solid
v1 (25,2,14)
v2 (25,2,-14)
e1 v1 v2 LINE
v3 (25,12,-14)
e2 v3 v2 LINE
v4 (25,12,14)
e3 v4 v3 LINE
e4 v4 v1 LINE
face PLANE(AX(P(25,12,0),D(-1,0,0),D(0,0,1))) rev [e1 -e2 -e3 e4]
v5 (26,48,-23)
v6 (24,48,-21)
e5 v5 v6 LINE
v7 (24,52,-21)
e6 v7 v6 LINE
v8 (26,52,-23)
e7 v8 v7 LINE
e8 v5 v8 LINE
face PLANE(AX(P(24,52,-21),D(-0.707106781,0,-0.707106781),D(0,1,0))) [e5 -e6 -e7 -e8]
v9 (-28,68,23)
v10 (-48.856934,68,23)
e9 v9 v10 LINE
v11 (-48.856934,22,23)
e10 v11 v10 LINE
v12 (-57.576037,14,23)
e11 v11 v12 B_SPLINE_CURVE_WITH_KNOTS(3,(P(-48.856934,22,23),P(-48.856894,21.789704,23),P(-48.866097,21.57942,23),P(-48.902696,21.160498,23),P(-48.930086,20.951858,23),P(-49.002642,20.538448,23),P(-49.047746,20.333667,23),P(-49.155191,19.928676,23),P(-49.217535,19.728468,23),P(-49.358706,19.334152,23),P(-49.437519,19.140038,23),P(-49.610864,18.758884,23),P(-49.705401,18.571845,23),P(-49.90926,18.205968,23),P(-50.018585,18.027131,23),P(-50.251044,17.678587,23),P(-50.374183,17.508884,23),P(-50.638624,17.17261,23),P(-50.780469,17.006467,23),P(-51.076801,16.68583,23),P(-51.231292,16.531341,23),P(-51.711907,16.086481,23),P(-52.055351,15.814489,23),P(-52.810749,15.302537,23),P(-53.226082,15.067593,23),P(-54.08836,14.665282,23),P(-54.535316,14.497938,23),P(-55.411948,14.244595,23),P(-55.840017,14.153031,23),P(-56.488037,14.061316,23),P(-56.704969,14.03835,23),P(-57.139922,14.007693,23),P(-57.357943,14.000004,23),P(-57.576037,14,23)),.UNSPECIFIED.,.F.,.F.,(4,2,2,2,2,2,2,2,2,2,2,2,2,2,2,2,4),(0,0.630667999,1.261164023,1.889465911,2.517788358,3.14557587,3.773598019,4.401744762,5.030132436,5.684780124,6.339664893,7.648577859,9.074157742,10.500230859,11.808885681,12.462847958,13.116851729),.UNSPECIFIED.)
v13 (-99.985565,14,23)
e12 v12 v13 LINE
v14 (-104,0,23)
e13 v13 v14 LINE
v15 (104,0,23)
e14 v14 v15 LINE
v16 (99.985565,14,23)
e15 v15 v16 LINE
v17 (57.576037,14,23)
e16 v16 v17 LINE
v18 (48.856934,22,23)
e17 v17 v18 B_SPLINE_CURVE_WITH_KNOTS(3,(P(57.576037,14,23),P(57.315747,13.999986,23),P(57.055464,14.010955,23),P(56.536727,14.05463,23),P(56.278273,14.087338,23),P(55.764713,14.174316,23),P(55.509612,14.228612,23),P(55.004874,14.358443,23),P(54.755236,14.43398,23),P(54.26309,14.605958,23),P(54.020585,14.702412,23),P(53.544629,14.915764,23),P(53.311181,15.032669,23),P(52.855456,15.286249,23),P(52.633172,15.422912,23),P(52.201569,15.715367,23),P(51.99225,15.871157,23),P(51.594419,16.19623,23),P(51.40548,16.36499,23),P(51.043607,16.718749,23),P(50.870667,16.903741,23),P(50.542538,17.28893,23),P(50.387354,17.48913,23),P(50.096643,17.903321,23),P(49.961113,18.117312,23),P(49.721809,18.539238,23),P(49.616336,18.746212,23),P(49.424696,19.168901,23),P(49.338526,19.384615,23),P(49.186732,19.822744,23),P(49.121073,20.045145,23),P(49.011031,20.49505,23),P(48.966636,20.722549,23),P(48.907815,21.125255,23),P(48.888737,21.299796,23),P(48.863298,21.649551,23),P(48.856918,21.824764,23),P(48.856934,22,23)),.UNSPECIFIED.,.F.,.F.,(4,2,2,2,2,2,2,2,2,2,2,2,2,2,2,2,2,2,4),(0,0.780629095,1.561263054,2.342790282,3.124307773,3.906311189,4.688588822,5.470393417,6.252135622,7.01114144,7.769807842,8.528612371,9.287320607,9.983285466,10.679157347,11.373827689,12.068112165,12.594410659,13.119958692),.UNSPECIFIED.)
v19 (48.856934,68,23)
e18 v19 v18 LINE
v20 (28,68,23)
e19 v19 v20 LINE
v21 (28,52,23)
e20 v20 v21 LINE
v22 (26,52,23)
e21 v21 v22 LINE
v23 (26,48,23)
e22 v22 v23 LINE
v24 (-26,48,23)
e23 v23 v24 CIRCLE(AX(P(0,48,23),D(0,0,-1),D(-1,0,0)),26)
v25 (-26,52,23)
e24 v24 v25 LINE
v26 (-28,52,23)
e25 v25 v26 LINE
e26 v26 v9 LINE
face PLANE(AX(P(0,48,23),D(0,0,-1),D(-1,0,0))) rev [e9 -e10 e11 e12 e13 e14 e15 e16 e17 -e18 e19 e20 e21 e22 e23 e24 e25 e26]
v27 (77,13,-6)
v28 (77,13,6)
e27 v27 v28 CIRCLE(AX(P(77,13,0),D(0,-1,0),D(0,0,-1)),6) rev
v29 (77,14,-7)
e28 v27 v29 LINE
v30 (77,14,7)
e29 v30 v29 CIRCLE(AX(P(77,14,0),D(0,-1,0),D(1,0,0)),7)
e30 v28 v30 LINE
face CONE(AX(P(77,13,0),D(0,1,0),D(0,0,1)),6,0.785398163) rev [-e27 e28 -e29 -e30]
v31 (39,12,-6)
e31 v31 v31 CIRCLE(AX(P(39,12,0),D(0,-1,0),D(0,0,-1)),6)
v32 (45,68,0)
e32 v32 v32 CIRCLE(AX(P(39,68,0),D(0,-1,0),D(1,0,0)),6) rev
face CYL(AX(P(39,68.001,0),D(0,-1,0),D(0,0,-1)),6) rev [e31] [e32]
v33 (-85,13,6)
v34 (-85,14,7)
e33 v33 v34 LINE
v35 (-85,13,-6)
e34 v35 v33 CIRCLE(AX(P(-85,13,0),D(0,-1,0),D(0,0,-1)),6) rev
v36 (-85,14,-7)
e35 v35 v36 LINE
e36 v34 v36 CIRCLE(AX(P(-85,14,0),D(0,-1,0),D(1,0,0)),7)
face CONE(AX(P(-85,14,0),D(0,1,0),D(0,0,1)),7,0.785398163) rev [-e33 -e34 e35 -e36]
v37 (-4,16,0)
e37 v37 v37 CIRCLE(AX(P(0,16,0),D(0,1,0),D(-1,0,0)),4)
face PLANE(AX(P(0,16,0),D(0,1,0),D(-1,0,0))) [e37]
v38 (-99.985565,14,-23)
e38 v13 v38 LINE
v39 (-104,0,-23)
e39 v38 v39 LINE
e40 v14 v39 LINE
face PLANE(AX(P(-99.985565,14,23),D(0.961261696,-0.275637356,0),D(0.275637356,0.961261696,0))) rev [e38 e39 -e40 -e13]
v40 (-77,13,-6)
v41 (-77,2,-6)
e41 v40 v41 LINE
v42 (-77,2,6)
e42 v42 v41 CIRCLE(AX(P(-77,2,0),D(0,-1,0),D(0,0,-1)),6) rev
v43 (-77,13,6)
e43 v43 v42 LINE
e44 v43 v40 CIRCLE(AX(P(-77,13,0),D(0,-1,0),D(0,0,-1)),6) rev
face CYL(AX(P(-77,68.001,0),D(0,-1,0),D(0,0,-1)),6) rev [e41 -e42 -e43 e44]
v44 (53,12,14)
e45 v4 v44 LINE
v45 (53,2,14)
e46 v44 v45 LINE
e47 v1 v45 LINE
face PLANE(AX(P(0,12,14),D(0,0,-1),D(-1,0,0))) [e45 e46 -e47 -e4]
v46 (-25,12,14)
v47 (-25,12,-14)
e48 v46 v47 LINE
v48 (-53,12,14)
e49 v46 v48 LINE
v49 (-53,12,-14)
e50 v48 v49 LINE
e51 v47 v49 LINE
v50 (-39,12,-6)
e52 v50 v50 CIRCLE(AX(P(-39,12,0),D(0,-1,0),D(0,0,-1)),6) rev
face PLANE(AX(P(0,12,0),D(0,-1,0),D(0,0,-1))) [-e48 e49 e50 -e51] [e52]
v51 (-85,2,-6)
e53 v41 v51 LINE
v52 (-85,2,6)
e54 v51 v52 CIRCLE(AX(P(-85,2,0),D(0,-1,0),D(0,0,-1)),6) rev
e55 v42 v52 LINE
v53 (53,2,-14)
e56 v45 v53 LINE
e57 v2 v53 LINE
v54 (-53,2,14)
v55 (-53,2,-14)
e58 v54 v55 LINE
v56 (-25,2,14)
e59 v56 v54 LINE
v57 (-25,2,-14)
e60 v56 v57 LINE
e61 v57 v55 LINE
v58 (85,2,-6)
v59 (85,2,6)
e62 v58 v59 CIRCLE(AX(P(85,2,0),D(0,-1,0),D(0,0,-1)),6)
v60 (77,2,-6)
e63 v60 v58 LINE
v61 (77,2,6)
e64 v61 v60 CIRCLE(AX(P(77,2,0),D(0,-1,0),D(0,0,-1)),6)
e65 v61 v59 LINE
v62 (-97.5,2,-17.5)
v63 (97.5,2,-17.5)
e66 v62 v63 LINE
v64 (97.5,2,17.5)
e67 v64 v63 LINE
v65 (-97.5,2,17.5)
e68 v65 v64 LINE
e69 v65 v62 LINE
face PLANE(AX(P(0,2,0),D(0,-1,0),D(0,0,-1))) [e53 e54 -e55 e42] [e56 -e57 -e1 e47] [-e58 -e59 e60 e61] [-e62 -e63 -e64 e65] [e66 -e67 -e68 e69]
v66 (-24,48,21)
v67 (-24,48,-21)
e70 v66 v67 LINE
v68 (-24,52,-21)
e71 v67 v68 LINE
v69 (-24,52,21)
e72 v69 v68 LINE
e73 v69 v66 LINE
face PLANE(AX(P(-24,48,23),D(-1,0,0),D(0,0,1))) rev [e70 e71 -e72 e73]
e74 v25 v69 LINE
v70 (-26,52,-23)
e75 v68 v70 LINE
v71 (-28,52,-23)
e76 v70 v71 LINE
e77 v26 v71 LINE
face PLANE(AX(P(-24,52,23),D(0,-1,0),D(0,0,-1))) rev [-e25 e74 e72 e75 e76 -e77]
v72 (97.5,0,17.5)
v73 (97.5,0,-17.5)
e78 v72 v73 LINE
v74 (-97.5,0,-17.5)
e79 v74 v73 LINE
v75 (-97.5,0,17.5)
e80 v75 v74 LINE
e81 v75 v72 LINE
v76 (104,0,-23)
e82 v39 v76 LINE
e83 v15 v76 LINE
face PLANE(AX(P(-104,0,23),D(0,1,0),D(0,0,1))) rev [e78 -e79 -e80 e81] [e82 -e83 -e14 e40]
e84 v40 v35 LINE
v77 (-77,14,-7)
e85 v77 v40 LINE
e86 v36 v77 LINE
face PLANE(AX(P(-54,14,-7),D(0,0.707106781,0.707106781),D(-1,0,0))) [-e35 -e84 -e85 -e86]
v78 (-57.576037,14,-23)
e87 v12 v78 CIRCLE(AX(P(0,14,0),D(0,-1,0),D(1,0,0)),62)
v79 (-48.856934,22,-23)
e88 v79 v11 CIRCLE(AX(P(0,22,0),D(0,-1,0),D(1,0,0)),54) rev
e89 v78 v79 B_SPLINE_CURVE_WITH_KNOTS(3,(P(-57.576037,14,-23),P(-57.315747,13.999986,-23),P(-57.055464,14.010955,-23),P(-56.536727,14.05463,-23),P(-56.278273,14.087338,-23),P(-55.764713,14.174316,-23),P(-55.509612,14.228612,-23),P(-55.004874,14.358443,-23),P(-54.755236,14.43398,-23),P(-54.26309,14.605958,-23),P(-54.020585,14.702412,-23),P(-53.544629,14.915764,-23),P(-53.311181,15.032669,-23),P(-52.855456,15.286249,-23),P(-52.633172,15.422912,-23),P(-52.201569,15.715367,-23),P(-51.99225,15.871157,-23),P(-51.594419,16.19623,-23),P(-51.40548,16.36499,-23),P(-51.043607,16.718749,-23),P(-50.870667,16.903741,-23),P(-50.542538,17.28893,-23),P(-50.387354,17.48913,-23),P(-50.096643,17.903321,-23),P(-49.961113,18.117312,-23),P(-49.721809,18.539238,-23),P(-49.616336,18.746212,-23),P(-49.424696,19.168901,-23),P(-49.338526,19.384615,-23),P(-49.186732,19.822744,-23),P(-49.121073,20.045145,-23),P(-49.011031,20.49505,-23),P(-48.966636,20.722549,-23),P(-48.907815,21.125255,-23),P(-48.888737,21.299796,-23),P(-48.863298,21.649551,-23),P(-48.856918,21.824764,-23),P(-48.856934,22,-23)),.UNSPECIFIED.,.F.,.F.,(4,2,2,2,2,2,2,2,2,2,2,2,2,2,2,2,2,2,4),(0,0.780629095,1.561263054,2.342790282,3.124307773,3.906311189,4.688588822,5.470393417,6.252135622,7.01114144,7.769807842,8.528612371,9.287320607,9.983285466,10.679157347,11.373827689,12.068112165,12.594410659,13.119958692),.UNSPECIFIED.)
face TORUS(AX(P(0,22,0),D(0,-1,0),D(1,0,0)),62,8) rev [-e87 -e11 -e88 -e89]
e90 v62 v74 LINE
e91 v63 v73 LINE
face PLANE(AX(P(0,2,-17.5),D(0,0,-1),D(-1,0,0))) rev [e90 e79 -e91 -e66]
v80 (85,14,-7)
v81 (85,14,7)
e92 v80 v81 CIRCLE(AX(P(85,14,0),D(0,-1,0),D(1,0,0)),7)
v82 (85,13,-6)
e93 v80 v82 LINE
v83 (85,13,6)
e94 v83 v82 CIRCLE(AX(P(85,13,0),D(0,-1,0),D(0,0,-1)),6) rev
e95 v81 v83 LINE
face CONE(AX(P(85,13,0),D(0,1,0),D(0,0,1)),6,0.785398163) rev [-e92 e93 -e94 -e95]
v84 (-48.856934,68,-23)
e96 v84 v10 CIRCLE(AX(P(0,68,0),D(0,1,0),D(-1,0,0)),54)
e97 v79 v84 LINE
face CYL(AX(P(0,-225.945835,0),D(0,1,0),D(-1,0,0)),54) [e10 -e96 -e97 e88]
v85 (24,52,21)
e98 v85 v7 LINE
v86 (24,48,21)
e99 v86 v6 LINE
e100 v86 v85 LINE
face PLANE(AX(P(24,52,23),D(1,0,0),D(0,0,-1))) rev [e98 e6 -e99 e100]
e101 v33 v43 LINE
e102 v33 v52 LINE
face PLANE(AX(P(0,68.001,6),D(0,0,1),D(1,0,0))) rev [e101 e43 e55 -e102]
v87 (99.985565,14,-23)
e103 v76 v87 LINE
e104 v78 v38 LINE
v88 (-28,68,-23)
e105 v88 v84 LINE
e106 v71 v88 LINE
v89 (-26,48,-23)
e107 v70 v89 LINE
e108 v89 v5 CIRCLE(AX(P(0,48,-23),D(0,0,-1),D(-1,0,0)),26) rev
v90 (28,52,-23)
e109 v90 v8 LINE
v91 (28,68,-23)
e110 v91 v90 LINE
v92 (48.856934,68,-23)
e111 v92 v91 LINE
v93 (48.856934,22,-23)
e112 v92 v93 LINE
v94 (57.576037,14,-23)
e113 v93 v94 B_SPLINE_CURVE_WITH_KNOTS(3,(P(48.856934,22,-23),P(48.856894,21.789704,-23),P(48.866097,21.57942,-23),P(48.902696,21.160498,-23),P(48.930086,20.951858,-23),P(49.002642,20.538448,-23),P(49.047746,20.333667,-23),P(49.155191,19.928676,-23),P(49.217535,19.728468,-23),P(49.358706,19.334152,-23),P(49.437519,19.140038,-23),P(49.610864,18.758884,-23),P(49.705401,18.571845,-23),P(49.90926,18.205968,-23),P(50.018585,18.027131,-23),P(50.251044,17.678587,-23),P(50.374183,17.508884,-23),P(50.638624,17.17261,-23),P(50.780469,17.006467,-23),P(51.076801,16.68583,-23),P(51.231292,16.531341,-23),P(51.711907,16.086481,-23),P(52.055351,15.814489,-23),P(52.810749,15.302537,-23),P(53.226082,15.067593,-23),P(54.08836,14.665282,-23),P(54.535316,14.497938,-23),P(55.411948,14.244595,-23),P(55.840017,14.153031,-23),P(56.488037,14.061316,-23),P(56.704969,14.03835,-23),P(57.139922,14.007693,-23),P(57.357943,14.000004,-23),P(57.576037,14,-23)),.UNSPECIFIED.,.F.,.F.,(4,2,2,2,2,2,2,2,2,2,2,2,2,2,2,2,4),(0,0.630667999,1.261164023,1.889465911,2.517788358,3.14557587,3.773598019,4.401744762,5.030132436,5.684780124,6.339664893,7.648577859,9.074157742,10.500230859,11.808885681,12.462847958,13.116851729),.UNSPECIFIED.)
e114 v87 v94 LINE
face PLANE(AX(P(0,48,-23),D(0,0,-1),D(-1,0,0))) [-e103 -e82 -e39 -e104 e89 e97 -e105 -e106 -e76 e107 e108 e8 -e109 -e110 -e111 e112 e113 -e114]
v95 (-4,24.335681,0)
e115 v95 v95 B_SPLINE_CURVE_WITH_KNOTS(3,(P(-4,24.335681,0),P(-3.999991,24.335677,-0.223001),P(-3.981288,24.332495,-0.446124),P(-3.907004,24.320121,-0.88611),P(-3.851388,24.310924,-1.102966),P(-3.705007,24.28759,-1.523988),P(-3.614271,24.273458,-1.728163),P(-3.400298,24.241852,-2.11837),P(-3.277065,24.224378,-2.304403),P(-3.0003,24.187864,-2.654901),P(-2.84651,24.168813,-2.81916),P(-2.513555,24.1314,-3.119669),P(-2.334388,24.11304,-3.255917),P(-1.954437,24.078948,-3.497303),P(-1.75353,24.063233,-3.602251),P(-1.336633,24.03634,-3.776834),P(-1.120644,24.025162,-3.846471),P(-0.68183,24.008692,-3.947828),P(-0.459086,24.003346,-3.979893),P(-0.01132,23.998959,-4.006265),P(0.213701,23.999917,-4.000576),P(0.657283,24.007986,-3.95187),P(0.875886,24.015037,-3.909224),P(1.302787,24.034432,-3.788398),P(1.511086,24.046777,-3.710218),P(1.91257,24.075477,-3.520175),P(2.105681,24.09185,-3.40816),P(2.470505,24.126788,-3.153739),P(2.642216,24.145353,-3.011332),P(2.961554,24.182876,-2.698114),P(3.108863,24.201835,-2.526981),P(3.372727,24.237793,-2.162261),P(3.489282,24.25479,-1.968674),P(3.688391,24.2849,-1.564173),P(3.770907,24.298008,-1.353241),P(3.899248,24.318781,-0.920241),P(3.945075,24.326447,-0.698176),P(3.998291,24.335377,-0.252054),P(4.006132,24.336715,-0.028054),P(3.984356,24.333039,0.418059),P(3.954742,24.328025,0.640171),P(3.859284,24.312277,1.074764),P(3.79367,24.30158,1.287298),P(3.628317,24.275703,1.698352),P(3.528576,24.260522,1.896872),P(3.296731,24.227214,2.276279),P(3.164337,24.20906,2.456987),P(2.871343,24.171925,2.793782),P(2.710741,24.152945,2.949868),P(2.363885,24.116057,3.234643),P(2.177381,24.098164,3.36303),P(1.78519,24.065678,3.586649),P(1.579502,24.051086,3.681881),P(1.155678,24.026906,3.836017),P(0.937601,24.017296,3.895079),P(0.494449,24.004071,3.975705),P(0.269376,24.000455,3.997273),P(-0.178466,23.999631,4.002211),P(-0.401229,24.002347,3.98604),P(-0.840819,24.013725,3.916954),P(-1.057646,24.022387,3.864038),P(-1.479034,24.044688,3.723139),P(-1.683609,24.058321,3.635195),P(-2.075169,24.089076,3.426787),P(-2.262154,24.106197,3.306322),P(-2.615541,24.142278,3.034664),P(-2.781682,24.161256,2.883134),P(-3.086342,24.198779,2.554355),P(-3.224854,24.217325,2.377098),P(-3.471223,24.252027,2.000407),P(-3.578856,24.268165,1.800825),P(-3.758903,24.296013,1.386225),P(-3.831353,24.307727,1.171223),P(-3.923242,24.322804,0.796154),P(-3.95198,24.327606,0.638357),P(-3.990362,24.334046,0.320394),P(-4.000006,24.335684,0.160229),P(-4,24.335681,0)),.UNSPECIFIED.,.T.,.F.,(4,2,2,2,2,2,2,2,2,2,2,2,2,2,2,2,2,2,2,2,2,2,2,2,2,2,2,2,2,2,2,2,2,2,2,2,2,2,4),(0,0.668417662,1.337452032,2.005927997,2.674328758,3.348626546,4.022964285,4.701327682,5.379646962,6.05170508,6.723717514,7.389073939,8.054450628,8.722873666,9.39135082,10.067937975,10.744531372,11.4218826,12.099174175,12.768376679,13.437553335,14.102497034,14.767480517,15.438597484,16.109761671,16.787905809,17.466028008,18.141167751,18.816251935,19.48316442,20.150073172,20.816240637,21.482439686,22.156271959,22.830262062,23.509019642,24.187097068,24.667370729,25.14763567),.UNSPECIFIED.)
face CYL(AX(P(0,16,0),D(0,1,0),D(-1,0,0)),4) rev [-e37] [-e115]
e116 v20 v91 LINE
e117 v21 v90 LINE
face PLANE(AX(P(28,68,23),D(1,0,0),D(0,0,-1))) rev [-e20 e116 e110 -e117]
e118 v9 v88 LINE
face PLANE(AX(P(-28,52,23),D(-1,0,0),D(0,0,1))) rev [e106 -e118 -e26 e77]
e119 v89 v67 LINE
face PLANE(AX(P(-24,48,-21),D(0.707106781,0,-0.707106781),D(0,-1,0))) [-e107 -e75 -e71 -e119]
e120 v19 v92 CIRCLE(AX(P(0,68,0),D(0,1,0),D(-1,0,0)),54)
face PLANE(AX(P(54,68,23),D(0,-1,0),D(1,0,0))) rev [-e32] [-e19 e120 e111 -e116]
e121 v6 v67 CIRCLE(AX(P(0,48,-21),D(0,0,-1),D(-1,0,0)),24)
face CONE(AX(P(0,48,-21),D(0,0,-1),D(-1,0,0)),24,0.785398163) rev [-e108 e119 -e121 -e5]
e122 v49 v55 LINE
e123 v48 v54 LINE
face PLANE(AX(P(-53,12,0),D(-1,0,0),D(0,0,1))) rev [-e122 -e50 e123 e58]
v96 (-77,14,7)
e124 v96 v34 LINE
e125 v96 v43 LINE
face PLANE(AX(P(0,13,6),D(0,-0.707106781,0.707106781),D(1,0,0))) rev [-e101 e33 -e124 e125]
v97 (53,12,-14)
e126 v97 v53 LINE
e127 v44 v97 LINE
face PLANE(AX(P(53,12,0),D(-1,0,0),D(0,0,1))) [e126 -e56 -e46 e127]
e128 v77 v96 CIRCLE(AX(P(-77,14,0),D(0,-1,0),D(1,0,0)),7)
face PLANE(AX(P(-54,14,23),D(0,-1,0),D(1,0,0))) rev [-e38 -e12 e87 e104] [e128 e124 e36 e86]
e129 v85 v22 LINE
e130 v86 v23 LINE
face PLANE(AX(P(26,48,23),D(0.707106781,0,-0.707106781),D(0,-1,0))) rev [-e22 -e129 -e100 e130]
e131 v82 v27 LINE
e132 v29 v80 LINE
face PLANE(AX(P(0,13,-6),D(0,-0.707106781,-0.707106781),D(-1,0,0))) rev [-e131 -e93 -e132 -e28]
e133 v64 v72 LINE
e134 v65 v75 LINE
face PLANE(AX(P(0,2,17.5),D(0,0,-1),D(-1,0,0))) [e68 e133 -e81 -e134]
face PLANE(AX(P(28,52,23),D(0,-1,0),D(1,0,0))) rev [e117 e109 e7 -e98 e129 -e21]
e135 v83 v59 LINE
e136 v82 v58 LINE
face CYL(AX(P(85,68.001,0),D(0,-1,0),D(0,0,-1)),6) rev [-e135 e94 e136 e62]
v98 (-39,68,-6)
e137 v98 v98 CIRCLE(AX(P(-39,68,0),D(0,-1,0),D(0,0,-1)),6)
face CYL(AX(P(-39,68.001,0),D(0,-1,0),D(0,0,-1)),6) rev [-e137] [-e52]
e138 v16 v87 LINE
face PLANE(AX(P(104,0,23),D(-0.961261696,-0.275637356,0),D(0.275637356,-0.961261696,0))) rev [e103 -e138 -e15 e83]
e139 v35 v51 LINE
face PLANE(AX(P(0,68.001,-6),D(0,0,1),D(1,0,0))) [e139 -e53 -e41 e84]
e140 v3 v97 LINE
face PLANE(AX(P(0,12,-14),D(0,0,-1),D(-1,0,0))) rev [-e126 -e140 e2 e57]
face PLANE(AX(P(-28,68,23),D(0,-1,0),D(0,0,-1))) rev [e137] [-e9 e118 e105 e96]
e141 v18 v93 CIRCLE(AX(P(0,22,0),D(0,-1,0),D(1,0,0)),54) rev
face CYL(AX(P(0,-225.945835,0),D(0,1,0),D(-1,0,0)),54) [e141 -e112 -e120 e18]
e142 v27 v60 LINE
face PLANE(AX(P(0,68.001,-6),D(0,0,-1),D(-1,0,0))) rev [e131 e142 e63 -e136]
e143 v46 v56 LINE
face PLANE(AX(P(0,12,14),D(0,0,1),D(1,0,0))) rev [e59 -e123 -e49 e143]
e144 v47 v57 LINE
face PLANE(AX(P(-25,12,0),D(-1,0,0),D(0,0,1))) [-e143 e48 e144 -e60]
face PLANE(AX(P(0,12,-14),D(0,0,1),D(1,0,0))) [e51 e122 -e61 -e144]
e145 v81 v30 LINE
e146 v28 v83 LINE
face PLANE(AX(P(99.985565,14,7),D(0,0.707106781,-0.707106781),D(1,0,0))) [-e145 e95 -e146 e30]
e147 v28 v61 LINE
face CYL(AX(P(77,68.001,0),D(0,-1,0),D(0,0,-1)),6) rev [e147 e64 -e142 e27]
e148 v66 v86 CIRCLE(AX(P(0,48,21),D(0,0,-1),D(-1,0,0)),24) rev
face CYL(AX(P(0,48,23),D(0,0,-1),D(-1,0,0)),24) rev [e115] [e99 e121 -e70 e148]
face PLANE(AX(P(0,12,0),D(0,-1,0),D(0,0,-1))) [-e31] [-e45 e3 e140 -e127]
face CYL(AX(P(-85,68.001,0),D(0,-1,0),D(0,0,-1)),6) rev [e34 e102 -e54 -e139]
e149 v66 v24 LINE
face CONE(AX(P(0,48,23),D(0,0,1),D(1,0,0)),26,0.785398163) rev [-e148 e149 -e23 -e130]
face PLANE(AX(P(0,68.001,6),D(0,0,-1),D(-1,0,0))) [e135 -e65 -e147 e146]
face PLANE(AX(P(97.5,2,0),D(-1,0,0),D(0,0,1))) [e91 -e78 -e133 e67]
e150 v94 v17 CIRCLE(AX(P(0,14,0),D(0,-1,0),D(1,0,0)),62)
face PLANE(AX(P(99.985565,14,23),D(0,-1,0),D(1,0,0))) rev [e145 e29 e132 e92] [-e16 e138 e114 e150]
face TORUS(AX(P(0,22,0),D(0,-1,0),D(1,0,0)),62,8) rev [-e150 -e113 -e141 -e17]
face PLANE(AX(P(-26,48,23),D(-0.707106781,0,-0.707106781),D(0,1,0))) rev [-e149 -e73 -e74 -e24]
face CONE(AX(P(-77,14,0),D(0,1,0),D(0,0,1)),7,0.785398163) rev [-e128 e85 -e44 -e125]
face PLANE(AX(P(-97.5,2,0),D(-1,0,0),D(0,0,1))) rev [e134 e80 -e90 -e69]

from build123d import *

# Parameters (mm, degrees)
BOSS_EXTRUDE1_DEPTH = 23
CUT_EXTRUDE1_START  = -54
CUT_EXTRUDE1_DEPTH  = 54
CUT_EXTRUDE2_REACH  = 128.369
SKETCH3_R           = 6
SKETCH3_3_W         = 28
SKETCH3_3_H         = 28
SKETCH3_3_R         = 6
CUT_EXTRUDE3_DEPTH  = 12
SKETCH3_4_W         = 195
SKETCH3_4_H         = 35
SKETCH3_4_W_2       = 28
SKETCH3_4_H_2       = 28
CUT_EXTRUDE4_DEPTH  = 2
FILLET1_R           = 8
CHAMFER1_SIZE       = 2
CHAMFER2_SIZE       = 1
SKETCH4_R           = 4
CUT_EXTRUDE5_DEPTH  = 52


# Read off the part's stored shape, not the designer's step: Cut-Extrude1
with BuildPart() as part:
    # Sketch1 → Boss-Extrude1 (new, symmetric)
    with BuildSketch(Plane.XY):
        with BuildLine():
            Line((-104, 0), (104, 0))
            Line((104, 0), (99.985564599, 14))
            Line((99.985564599, 14), (54, 14))
            Line((54, 14), (54, 68))
            Line((54, 68), (28, 68))
            Line((28, 68), (28, 52))
            Line((28, 52), (24, 52))
            Line((24, 52), (24, 48))
            ThreePointArc((24, 48), (0, 24), (-24, 48))
            Line((-24, 48), (-24, 52))
            Line((-24, 52), (-28, 52))
            Line((-28, 52), (-28, 68))
            Line((-28, 68), (-54, 68))
            Line((-54, 68), (-54, 14))
            Line((-54, 14), (-99.985564599, 14))
            Line((-99.985564599, 14), (-104, 0))
        make_face()
    extrude(amount=BOSS_EXTRUDE1_DEPTH, both=True)

    # Cut-Extrude1 outline → Cut-Extrude1 (cut)
    with BuildSketch(Plane(origin=(0, 68, 0), x_dir=(1, 0, 0), z_dir=(0, 1, 0)).offset(CUT_EXTRUDE1_START)):
        with BuildLine():
            ThreePointArc((-54, 0), (-52.698550436, 11.784005345), (-48.856934001, 23))
            Line((-48.856934001, 23), (-54, 23))
            Line((-54, 23), (-54, 0))
        make_face()
        with BuildLine():
            ThreePointArc((-48.856934001, -23), (-52.698550436, -11.784005345), (-54, 0))
            Line((-54, 0), (-54, -23))
            Line((-54, -23), (-48.856934001, -23))
        make_face()
        with BuildLine():
            Line((54, 23), (48.856934001, 23))
            ThreePointArc((48.856934001, 23), (52.698550436, 11.784005345), (54, 0))
            Line((54, 0), (54, 23))
        make_face()
        with BuildLine():
            Line((54, -23), (54, 0))
            ThreePointArc((54, 0), (52.698550436, -11.784005345), (48.856934001, -23))
            Line((48.856934001, -23), (54, -23))
        make_face()
    extrude(amount=CUT_EXTRUDE1_DEPTH, mode=Mode.SUBTRACT)

    # Sketch3 → Cut-Extrude2 (cut, up to next)
    with BuildSketch(Plane.XZ, mode=Mode.PRIVATE) as cut_extrude2_sk1:
        with Locations(Location((-39, 0, 0), (0, 0, 270))):
            Circle(SKETCH3_R)
    cut_extrude2_tool1 = extrude(cut_extrude2_sk1.sketch, amount=-CUT_EXTRUDE2_REACH, mode=Mode.PRIVATE) & part.part
    # Sketch3 → Cut-Extrude2 (cut, up to next)
    with BuildSketch(Plane.XZ, mode=Mode.PRIVATE) as cut_extrude2_sk2:
        with Locations(Location((39, 0, 0), (0, 0, 270))):
            Circle(SKETCH3_R)
    cut_extrude2_tool2 = extrude(cut_extrude2_sk2.sketch, amount=-CUT_EXTRUDE2_REACH, mode=Mode.PRIVATE) & part.part
    # Sketch3 → Cut-Extrude2 (cut, up to next)
    with BuildSketch(Plane.XZ, mode=Mode.PRIVATE) as cut_extrude2_sk3:
        with BuildLine():
            Line((77, -6), (85, -6))
            ThreePointArc((85, -6), (91, 0), (85, 6))
            Line((85, 6), (77, 6))
            ThreePointArc((77, 6), (71, 0), (77, -6))
        make_face()
    cut_extrude2_tool3 = extrude(cut_extrude2_sk3.sketch, amount=-CUT_EXTRUDE2_REACH, mode=Mode.PRIVATE) & part.part
    # Sketch3 → Cut-Extrude2 (cut, up to next)
    with BuildSketch(Plane.XZ, mode=Mode.PRIVATE) as cut_extrude2_sk4:
        with BuildLine():
            ThreePointArc((-85, -6), (-91, 0), (-85, 6))
            Line((-85, 6), (-77, 6))
            ThreePointArc((-77, 6), (-71, 0), (-77, -6))
            Line((-77, -6), (-85, -6))
        make_face()
    cut_extrude2_tool4 = extrude(cut_extrude2_sk4.sketch, amount=-CUT_EXTRUDE2_REACH, mode=Mode.PRIVATE) & part.part
    add(cut_extrude2_tool1.solids().sort_by_distance((-39, 0, 0))[0], mode=Mode.SUBTRACT)
    add(cut_extrude2_tool2.solids().sort_by_distance((39, 0, 0))[0], mode=Mode.SUBTRACT)
    add(cut_extrude2_tool3.solids().sort_by_distance((81, 0, 0))[0], mode=Mode.SUBTRACT)
    add(cut_extrude2_tool4.solids().sort_by_distance((-81, 0, 0))[0], mode=Mode.SUBTRACT)

    # Sketch3<3> → Cut-Extrude3 (cut)
    # profile 1 of 2: a face of its own
    with BuildSketch(Plane.XZ):
        with Locations((39, 0)):
            Rectangle(SKETCH3_3_W, SKETCH3_3_H)
        with Locations(Location((39, 0, 0), (0, 0, 270))):
            Circle(SKETCH3_3_R, mode=Mode.SUBTRACT)
    # profile 2 of 2: a face of its own
    with BuildSketch(Plane.XZ):
        with Locations((-39, 0)):
            Rectangle(SKETCH3_3_W, SKETCH3_3_H)
        with Locations(Location((-39, 0, 0), (0, 0, 270))):
            Circle(SKETCH3_3_R, mode=Mode.SUBTRACT)
    extrude(amount=-CUT_EXTRUDE3_DEPTH, mode=Mode.SUBTRACT)

    # Sketch3<4> → Cut-Extrude4 (cut)
    with BuildSketch(Plane.XZ):
        Rectangle(SKETCH3_4_W, SKETCH3_4_H)
        with BuildLine():
            ThreePointArc((85, -6), (91, 0), (85, 6))
            Line((85, 6), (77, 6))
            ThreePointArc((77, 6), (71, 0), (77, -6))
            Line((77, -6), (85, -6))
        make_face(mode=Mode.SUBTRACT)
        with Locations((-39, 0)):
            Rectangle(SKETCH3_4_W_2, SKETCH3_4_H_2, mode=Mode.SUBTRACT)
        with Locations((39, 0)):
            Rectangle(SKETCH3_4_W_2, SKETCH3_4_H_2, mode=Mode.SUBTRACT)
        with BuildLine():
            Line((-77, -6), (-85, -6))
            ThreePointArc((-85, -6), (-91, 0), (-85, 6))
            Line((-85, 6), (-77, 6))
            ThreePointArc((-77, 6), (-71, 0), (-77, -6))
        make_face(mode=Mode.SUBTRACT)
    extrude(amount=-CUT_EXTRUDE4_DEPTH, mode=Mode.SUBTRACT)

    # Fillet1
    fillet1_edges = [part.edges().sort_by_distance(p)[0] for p in [
        (-52.698550436, 14, -11.784005345),
        (52.698550436, 14, -11.784005345),
    ]]
    fillet(fillet1_edges, radius=FILLET1_R)

    # Chamfer1
    chamfer1_edges = [part.edges().sort_by_distance(p)[0] for p in [
        (-24, 50, -23),
        (0, 24, -23),
        (24, 50, -23),
        (24, 50, 23),
        (0, 24, 23),
        (-24, 50, 23),
    ]]
    chamfer(chamfer1_edges, length=CHAMFER1_SIZE)

    # Chamfer2
    chamfer2_edges = [part.edges().sort_by_distance(p)[0] for p in [
        (91, 14, 0),
        (81, 14, -6),
        (71, 14, 0),
        (-91, 14, 0),
        (-71, 14, 0),
        (-81, 14, -6),
        (-81, 14, 6),
        (81, 14, 6),
    ]]
    chamfer(chamfer2_edges, length=CHAMFER2_SIZE)

    # Sketch4 → Cut-Extrude5 (cut)
    with BuildSketch(Plane(origin=(0, 68, 0), x_dir=(1, 0, 0), z_dir=(0, 1, 0))):
        with Locations(Location((0, 0, 0), (0, 0, 180))):
            Circle(SKETCH4_R)
    extrude(amount=-CUT_EXTRUDE5_DEPTH, mode=Mode.SUBTRACT)


solid = part.part
